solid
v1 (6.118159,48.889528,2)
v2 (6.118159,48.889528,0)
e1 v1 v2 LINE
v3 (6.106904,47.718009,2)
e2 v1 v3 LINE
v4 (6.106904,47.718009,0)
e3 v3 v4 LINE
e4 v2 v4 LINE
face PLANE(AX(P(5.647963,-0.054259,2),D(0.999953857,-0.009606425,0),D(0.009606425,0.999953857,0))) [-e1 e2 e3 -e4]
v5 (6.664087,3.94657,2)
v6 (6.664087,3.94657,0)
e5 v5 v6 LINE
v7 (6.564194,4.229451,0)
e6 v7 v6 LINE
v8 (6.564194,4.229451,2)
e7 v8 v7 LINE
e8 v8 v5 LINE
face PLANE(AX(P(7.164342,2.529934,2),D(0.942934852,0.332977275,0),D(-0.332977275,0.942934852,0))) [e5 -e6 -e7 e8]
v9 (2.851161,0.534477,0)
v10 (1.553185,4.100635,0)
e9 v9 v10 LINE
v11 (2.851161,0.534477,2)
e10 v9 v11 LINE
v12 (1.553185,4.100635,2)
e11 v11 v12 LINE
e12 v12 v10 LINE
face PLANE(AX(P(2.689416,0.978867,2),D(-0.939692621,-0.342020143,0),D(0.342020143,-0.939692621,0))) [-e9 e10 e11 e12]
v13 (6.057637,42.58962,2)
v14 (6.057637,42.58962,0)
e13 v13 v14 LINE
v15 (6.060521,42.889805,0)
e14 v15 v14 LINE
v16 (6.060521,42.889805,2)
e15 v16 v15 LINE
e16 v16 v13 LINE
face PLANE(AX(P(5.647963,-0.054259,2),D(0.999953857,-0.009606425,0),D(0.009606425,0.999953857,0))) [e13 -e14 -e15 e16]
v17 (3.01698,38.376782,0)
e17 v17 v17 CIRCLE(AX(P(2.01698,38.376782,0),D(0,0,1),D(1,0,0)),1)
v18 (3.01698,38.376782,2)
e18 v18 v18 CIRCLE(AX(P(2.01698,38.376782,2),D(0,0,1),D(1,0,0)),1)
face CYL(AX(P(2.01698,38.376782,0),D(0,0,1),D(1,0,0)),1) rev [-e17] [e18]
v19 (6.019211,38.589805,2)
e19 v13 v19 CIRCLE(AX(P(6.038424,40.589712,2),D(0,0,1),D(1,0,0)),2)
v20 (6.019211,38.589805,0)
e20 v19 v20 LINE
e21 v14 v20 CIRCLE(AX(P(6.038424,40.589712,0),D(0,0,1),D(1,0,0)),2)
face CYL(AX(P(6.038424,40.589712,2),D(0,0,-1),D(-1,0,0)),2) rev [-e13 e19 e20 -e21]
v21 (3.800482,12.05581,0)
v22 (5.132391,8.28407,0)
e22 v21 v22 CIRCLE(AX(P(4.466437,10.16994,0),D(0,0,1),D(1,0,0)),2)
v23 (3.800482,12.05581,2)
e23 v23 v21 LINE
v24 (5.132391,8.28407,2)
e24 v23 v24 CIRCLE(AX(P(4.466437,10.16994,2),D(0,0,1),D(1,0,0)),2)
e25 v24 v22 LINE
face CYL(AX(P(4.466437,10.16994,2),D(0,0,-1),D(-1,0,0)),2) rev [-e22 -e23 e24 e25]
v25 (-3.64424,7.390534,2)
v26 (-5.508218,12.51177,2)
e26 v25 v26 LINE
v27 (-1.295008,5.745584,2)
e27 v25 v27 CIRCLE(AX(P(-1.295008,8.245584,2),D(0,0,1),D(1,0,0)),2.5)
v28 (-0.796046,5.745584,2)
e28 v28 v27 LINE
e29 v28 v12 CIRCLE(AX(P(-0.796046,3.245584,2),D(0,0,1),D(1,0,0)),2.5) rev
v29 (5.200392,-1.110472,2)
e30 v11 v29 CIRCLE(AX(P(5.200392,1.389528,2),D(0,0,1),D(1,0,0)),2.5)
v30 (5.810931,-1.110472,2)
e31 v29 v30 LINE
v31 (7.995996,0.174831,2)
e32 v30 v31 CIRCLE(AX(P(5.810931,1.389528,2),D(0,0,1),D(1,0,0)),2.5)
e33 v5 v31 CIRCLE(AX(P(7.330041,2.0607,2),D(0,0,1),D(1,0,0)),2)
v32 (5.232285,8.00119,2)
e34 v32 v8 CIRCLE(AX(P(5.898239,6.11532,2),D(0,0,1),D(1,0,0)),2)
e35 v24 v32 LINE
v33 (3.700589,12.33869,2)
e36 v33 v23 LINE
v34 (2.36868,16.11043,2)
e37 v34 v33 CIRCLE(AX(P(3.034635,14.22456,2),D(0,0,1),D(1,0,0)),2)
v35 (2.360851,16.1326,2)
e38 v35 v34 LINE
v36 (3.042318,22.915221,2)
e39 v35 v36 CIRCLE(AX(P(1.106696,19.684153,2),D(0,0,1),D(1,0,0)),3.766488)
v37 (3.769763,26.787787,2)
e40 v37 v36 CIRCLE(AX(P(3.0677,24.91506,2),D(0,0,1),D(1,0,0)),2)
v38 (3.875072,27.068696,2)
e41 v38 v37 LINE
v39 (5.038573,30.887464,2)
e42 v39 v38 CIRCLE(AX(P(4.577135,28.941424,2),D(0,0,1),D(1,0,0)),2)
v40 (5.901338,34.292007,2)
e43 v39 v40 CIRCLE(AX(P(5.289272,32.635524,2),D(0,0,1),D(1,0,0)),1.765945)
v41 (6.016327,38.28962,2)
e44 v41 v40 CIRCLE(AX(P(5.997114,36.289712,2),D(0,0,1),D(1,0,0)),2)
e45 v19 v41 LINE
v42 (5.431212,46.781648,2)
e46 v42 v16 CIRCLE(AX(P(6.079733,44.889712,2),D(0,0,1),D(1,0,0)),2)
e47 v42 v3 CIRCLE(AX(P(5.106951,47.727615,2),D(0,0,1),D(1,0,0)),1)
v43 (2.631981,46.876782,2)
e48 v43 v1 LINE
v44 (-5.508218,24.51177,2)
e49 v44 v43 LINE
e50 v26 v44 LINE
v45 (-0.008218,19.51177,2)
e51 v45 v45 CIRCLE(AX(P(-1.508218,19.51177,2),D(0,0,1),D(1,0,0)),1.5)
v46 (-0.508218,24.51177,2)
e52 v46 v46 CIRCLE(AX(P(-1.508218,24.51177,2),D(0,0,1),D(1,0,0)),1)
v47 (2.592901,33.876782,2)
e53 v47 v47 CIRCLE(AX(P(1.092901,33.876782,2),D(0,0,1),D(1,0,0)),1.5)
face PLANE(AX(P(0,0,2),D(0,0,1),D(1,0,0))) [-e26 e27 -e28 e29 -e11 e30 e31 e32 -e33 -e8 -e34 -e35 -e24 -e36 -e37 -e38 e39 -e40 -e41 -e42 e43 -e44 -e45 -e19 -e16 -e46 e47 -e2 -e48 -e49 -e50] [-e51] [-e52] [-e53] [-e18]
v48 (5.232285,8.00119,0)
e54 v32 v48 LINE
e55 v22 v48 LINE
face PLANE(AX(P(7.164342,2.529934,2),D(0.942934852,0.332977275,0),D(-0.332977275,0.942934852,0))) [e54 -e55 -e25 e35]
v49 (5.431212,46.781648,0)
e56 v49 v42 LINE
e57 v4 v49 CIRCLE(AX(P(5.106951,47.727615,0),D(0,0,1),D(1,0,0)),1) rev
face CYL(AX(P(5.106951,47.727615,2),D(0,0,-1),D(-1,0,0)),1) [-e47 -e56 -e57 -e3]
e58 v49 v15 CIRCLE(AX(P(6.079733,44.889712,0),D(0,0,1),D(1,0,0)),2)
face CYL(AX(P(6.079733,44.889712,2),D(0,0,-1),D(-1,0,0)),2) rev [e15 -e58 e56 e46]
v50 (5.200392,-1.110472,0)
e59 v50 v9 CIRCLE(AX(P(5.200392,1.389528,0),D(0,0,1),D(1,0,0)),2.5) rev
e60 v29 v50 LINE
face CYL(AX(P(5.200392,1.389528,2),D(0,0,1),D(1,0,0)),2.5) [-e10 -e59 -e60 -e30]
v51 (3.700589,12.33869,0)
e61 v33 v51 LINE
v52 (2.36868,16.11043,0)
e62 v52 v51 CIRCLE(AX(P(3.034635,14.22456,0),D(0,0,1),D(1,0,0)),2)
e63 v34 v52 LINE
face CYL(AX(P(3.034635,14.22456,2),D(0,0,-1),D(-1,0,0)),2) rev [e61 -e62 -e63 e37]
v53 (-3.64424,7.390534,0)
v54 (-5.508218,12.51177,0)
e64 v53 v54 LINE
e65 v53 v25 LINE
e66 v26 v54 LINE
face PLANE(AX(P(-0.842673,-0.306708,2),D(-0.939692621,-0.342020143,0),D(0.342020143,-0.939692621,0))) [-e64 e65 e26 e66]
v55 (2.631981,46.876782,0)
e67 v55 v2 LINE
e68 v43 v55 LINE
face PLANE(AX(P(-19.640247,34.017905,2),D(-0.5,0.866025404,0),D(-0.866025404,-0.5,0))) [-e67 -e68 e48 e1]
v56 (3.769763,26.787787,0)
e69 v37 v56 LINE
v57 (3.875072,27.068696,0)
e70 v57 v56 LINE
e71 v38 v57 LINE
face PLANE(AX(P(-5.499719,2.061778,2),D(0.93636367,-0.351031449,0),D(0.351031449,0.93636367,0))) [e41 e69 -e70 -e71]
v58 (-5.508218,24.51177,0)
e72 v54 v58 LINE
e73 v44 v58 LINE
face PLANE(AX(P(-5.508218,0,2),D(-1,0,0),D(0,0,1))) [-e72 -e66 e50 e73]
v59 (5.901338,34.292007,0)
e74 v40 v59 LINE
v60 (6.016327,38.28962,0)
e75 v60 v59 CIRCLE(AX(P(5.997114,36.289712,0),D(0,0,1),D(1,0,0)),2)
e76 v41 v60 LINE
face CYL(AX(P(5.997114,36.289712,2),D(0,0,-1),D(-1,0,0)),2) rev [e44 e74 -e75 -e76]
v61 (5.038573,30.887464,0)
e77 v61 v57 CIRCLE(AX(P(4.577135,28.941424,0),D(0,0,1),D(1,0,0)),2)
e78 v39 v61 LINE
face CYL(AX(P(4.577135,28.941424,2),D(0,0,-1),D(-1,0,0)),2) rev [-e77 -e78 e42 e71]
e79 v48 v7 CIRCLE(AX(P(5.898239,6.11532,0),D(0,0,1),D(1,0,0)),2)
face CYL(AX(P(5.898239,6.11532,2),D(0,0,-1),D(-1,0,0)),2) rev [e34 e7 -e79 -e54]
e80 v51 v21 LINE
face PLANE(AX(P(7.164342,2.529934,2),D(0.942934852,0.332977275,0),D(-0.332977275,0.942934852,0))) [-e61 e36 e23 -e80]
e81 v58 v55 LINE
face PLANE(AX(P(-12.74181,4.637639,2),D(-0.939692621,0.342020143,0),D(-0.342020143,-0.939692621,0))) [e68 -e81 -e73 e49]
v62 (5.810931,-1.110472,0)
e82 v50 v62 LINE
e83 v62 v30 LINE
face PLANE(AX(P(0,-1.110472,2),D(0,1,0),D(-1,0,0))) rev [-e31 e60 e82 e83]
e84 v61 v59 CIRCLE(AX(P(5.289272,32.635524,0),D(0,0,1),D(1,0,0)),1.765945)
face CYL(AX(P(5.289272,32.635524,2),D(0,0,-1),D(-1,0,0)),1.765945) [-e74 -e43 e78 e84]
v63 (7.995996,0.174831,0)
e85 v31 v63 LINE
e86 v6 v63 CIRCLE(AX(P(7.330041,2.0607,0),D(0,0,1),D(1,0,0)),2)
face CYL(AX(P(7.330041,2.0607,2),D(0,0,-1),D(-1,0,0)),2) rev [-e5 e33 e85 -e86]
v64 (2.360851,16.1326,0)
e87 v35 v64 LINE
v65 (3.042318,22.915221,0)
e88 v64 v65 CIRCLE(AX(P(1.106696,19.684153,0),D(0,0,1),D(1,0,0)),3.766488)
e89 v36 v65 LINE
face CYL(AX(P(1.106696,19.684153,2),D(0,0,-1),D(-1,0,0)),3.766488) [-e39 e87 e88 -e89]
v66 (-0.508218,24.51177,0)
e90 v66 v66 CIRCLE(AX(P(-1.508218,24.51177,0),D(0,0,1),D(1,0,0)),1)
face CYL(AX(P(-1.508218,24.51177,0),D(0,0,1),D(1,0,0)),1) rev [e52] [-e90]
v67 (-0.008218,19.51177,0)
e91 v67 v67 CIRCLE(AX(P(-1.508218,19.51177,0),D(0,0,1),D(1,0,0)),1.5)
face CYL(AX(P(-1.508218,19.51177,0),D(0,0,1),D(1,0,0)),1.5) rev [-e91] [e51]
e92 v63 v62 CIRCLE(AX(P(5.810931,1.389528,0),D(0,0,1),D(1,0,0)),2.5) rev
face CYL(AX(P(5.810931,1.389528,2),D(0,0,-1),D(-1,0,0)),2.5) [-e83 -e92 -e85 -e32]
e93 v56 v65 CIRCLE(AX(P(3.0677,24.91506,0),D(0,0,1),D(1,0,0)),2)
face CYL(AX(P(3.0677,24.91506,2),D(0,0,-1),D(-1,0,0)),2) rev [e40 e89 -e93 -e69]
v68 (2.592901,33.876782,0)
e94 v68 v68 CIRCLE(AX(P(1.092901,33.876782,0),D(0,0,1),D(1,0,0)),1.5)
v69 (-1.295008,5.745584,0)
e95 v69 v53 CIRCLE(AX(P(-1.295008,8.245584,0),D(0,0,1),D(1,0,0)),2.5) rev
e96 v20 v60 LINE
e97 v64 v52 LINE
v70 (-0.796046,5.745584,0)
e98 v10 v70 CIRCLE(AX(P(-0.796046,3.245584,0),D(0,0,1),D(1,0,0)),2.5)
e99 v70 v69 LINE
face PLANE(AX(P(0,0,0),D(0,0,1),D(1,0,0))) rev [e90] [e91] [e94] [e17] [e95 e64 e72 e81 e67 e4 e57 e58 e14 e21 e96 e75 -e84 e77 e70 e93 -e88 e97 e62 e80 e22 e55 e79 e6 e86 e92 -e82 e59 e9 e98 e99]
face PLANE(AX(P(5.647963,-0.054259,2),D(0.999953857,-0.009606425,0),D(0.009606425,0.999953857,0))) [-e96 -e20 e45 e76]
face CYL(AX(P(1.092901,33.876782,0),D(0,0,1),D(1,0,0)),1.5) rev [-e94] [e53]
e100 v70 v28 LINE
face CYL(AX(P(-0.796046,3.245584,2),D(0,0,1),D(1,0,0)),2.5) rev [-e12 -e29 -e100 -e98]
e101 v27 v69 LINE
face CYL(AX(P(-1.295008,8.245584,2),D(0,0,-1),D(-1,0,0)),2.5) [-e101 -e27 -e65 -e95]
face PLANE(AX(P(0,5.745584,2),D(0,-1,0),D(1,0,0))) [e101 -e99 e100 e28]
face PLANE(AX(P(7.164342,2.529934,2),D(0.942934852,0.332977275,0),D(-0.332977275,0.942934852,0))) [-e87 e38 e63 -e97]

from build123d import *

# Parameters (mm, degrees)
BOSS_EXTRU_2_DEPTH      = 2
CONG_1_R                = 1
ESQUISSE2_R             = 1
ESQUISSE2_R_2           = 1.5
ENL_V_MAT_EXTRU_1_DEPTH = 50.654670275
CONG_2_R                = 2.5


with BuildPart() as part:
    # Esquisse1 → Boss.-Extru.2 (new body)
    with BuildSketch(Plane.XY):
        with BuildLine():
            Line((0.95447274, 5.745584386), (3.449873287, -1.110472271))
            Line((3.449873287, -1.110472271), (8.449873287, -1.110472271))
            Line((8.449873287, -1.110472271), (7.995996013, 0.174830759))
            ThreePointArc((7.995996013, 0.174830759), (5.44417176, 1.394745914), (6.664086914, 3.946570166))
            Line((6.664086914, 3.946570166), (6.564193732, 4.229450622))
            ThreePointArc((6.564193732, 4.229450622), (4.012369479, 5.449365776), (5.232284634, 8.001190029))
            Line((5.232284634, 8.001190029), (5.132391451, 8.284070484))
            ThreePointArc((5.132391451, 8.284070484), (2.580567198, 9.503985638), (3.800482353, 12.055809891))
            Line((3.800482353, 12.055809891), (3.70058917, 12.338690347))
            ThreePointArc((3.70058917, 12.338690347), (1.148764918, 13.558605501), (2.368680072, 16.110429753))
            Line((2.368680072, 16.110429753), (2.360851147, 16.132599934))
            ThreePointArc((2.360851147, 16.132599934), (4.854316205, 19.307619995), (3.042318195, 22.915220804))
            ThreePointArc((3.042318195, 22.915220804), (1.102078927, 25.284293174), (3.769763015, 26.787787077))
            Line((3.769763015, 26.787787077), (3.87507245, 27.068696178))
            ThreePointArc((3.87507245, 27.068696178), (2.663964414, 29.524327439), (5.038572788, 30.887464495))
            ThreePointArc((5.038572788, 30.887464495), (7.001105436, 32.201717881), (5.901338085, 34.292006887))
            ThreePointArc((5.901338085, 34.292006887), (3.997941168, 36.347217372), (6.01632714, 38.289620015))
            Line((6.01632714, 38.289620015), (6.019210973, 38.589804586))
            ThreePointArc((6.019210973, 38.589804586), (4.038516109, 40.608925151), (6.057636674, 42.589620015))
            Line((6.057636674, 42.589620015), (6.060520508, 42.889804586))
            ThreePointArc((6.060520508, 42.889804586), (4.079825644, 44.908925151), (6.098946209, 46.889620015))
            Line((6.098946209, 46.889620015), (6.11815906, 48.889527729))
            Line((6.11815906, 48.889527729), (2.631980822, 46.876781785))
            Line((2.631980822, 46.876781785), (-5.50821759, 24.511770458))
            Line((-5.50821759, 24.511770458), (-5.50821759, 12.511770458))
            Line((-5.50821759, 12.511770458), (-3.04552726, 5.745584386))
            Line((-3.04552726, 5.745584386), (0.95447274, 5.745584386))
        make_face()
    extrude(amount=BOSS_EXTRU_2_DEPTH)

    # Congé1
    cong_1_edges = [part.edges().sort_by_distance(p)[0] for p in [
        (6.098946209, 46.889620015, 1),
    ]]
    fillet(cong_1_edges, radius=CONG_1_R)

    # Esquisse2 → Enlèv. mat.-Extru.1 (cut, through all)
    with BuildSketch(Plane.XY.offset(2)):
        with Locations((2.016979912, 38.376781785)):
            Circle(ESQUISSE2_R)
        with Locations((1.092901094, 33.876781785)):
            Circle(ESQUISSE2_R_2)
        with Locations((-1.50821759, 19.511770458)):
            Circle(ESQUISSE2_R_2)
        with Locations((-1.50821759, 24.511770458)):
            Circle(ESQUISSE2_R)
    extrude(amount=-ENL_V_MAT_EXTRU_1_DEPTH, mode=Mode.SUBTRACT)

    # Congé2
    # the kernel refuses this fillet: 2.5 mm, written as the material it adds along each edge
    with BuildSketch(Plane(origin=(0.95447274, 5.745584386, 0), x_dir=(-1, 0, 0), z_dir=(0, 0, 1))) as cong_2_piece_1:
        with BuildLine():
            CenterArc((CONG_2_R * 0.70020753821, CONG_2_R), CONG_2_R, 200, 70)
            Line((-CONG_2_R * 0.239485082576, CONG_2_R * 0.657979856674), (0, 0))
            Line((0, 0), (CONG_2_R * 0.70020753821, 0))
        make_face()
    extrude(amount=2)
    # the kernel refuses this fillet: 2.5 mm, written as the material it takes off along each edge
    with BuildSketch(Plane(origin=(8.449873287, -1.110472271, -6.597356953), x_dir=(-1, 0, 0), z_dir=(0, 0, 1))) as cong_2_2_piece_1:
        with BuildLine():
            CenterArc((2.638942781, -2.5), CONG_2_R, 90, 60.929935742)
            Line((0.453877274, -1.28530303), (0, 0))
            Line((0, 0), (2.638942781, 0))
        make_face()
    extrude(amount=15.194713907, mode=Mode.SUBTRACT)
    with BuildSketch(Plane(origin=(3.449873287, -1.110472271, -4.376297114), x_dir=(-0.3420201433256723, 0.9396926207859071, 0), z_dir=(0, 0, 1)), Plane(origin=(-3.04552726, 5.745584386, -4.376297114), x_dir=(-0.34202014332566605, 0.9396926207859094, 0), z_dir=(0, 0, 1))) as cong_2_2_piece_2:
        with BuildLine():
            CenterArc((CONG_2_R * 0.70020753821, -CONG_2_R), CONG_2_R, 90, 70)
            Line((-CONG_2_R * 0.239485082576, -CONG_2_R * 0.657979856674), (0, 0))
            Line((0, 0), (CONG_2_R * 0.70020753821, 0))
        make_face()
    extrude(amount=10.752594228, mode=Mode.SUBTRACT)


solid = part.part
